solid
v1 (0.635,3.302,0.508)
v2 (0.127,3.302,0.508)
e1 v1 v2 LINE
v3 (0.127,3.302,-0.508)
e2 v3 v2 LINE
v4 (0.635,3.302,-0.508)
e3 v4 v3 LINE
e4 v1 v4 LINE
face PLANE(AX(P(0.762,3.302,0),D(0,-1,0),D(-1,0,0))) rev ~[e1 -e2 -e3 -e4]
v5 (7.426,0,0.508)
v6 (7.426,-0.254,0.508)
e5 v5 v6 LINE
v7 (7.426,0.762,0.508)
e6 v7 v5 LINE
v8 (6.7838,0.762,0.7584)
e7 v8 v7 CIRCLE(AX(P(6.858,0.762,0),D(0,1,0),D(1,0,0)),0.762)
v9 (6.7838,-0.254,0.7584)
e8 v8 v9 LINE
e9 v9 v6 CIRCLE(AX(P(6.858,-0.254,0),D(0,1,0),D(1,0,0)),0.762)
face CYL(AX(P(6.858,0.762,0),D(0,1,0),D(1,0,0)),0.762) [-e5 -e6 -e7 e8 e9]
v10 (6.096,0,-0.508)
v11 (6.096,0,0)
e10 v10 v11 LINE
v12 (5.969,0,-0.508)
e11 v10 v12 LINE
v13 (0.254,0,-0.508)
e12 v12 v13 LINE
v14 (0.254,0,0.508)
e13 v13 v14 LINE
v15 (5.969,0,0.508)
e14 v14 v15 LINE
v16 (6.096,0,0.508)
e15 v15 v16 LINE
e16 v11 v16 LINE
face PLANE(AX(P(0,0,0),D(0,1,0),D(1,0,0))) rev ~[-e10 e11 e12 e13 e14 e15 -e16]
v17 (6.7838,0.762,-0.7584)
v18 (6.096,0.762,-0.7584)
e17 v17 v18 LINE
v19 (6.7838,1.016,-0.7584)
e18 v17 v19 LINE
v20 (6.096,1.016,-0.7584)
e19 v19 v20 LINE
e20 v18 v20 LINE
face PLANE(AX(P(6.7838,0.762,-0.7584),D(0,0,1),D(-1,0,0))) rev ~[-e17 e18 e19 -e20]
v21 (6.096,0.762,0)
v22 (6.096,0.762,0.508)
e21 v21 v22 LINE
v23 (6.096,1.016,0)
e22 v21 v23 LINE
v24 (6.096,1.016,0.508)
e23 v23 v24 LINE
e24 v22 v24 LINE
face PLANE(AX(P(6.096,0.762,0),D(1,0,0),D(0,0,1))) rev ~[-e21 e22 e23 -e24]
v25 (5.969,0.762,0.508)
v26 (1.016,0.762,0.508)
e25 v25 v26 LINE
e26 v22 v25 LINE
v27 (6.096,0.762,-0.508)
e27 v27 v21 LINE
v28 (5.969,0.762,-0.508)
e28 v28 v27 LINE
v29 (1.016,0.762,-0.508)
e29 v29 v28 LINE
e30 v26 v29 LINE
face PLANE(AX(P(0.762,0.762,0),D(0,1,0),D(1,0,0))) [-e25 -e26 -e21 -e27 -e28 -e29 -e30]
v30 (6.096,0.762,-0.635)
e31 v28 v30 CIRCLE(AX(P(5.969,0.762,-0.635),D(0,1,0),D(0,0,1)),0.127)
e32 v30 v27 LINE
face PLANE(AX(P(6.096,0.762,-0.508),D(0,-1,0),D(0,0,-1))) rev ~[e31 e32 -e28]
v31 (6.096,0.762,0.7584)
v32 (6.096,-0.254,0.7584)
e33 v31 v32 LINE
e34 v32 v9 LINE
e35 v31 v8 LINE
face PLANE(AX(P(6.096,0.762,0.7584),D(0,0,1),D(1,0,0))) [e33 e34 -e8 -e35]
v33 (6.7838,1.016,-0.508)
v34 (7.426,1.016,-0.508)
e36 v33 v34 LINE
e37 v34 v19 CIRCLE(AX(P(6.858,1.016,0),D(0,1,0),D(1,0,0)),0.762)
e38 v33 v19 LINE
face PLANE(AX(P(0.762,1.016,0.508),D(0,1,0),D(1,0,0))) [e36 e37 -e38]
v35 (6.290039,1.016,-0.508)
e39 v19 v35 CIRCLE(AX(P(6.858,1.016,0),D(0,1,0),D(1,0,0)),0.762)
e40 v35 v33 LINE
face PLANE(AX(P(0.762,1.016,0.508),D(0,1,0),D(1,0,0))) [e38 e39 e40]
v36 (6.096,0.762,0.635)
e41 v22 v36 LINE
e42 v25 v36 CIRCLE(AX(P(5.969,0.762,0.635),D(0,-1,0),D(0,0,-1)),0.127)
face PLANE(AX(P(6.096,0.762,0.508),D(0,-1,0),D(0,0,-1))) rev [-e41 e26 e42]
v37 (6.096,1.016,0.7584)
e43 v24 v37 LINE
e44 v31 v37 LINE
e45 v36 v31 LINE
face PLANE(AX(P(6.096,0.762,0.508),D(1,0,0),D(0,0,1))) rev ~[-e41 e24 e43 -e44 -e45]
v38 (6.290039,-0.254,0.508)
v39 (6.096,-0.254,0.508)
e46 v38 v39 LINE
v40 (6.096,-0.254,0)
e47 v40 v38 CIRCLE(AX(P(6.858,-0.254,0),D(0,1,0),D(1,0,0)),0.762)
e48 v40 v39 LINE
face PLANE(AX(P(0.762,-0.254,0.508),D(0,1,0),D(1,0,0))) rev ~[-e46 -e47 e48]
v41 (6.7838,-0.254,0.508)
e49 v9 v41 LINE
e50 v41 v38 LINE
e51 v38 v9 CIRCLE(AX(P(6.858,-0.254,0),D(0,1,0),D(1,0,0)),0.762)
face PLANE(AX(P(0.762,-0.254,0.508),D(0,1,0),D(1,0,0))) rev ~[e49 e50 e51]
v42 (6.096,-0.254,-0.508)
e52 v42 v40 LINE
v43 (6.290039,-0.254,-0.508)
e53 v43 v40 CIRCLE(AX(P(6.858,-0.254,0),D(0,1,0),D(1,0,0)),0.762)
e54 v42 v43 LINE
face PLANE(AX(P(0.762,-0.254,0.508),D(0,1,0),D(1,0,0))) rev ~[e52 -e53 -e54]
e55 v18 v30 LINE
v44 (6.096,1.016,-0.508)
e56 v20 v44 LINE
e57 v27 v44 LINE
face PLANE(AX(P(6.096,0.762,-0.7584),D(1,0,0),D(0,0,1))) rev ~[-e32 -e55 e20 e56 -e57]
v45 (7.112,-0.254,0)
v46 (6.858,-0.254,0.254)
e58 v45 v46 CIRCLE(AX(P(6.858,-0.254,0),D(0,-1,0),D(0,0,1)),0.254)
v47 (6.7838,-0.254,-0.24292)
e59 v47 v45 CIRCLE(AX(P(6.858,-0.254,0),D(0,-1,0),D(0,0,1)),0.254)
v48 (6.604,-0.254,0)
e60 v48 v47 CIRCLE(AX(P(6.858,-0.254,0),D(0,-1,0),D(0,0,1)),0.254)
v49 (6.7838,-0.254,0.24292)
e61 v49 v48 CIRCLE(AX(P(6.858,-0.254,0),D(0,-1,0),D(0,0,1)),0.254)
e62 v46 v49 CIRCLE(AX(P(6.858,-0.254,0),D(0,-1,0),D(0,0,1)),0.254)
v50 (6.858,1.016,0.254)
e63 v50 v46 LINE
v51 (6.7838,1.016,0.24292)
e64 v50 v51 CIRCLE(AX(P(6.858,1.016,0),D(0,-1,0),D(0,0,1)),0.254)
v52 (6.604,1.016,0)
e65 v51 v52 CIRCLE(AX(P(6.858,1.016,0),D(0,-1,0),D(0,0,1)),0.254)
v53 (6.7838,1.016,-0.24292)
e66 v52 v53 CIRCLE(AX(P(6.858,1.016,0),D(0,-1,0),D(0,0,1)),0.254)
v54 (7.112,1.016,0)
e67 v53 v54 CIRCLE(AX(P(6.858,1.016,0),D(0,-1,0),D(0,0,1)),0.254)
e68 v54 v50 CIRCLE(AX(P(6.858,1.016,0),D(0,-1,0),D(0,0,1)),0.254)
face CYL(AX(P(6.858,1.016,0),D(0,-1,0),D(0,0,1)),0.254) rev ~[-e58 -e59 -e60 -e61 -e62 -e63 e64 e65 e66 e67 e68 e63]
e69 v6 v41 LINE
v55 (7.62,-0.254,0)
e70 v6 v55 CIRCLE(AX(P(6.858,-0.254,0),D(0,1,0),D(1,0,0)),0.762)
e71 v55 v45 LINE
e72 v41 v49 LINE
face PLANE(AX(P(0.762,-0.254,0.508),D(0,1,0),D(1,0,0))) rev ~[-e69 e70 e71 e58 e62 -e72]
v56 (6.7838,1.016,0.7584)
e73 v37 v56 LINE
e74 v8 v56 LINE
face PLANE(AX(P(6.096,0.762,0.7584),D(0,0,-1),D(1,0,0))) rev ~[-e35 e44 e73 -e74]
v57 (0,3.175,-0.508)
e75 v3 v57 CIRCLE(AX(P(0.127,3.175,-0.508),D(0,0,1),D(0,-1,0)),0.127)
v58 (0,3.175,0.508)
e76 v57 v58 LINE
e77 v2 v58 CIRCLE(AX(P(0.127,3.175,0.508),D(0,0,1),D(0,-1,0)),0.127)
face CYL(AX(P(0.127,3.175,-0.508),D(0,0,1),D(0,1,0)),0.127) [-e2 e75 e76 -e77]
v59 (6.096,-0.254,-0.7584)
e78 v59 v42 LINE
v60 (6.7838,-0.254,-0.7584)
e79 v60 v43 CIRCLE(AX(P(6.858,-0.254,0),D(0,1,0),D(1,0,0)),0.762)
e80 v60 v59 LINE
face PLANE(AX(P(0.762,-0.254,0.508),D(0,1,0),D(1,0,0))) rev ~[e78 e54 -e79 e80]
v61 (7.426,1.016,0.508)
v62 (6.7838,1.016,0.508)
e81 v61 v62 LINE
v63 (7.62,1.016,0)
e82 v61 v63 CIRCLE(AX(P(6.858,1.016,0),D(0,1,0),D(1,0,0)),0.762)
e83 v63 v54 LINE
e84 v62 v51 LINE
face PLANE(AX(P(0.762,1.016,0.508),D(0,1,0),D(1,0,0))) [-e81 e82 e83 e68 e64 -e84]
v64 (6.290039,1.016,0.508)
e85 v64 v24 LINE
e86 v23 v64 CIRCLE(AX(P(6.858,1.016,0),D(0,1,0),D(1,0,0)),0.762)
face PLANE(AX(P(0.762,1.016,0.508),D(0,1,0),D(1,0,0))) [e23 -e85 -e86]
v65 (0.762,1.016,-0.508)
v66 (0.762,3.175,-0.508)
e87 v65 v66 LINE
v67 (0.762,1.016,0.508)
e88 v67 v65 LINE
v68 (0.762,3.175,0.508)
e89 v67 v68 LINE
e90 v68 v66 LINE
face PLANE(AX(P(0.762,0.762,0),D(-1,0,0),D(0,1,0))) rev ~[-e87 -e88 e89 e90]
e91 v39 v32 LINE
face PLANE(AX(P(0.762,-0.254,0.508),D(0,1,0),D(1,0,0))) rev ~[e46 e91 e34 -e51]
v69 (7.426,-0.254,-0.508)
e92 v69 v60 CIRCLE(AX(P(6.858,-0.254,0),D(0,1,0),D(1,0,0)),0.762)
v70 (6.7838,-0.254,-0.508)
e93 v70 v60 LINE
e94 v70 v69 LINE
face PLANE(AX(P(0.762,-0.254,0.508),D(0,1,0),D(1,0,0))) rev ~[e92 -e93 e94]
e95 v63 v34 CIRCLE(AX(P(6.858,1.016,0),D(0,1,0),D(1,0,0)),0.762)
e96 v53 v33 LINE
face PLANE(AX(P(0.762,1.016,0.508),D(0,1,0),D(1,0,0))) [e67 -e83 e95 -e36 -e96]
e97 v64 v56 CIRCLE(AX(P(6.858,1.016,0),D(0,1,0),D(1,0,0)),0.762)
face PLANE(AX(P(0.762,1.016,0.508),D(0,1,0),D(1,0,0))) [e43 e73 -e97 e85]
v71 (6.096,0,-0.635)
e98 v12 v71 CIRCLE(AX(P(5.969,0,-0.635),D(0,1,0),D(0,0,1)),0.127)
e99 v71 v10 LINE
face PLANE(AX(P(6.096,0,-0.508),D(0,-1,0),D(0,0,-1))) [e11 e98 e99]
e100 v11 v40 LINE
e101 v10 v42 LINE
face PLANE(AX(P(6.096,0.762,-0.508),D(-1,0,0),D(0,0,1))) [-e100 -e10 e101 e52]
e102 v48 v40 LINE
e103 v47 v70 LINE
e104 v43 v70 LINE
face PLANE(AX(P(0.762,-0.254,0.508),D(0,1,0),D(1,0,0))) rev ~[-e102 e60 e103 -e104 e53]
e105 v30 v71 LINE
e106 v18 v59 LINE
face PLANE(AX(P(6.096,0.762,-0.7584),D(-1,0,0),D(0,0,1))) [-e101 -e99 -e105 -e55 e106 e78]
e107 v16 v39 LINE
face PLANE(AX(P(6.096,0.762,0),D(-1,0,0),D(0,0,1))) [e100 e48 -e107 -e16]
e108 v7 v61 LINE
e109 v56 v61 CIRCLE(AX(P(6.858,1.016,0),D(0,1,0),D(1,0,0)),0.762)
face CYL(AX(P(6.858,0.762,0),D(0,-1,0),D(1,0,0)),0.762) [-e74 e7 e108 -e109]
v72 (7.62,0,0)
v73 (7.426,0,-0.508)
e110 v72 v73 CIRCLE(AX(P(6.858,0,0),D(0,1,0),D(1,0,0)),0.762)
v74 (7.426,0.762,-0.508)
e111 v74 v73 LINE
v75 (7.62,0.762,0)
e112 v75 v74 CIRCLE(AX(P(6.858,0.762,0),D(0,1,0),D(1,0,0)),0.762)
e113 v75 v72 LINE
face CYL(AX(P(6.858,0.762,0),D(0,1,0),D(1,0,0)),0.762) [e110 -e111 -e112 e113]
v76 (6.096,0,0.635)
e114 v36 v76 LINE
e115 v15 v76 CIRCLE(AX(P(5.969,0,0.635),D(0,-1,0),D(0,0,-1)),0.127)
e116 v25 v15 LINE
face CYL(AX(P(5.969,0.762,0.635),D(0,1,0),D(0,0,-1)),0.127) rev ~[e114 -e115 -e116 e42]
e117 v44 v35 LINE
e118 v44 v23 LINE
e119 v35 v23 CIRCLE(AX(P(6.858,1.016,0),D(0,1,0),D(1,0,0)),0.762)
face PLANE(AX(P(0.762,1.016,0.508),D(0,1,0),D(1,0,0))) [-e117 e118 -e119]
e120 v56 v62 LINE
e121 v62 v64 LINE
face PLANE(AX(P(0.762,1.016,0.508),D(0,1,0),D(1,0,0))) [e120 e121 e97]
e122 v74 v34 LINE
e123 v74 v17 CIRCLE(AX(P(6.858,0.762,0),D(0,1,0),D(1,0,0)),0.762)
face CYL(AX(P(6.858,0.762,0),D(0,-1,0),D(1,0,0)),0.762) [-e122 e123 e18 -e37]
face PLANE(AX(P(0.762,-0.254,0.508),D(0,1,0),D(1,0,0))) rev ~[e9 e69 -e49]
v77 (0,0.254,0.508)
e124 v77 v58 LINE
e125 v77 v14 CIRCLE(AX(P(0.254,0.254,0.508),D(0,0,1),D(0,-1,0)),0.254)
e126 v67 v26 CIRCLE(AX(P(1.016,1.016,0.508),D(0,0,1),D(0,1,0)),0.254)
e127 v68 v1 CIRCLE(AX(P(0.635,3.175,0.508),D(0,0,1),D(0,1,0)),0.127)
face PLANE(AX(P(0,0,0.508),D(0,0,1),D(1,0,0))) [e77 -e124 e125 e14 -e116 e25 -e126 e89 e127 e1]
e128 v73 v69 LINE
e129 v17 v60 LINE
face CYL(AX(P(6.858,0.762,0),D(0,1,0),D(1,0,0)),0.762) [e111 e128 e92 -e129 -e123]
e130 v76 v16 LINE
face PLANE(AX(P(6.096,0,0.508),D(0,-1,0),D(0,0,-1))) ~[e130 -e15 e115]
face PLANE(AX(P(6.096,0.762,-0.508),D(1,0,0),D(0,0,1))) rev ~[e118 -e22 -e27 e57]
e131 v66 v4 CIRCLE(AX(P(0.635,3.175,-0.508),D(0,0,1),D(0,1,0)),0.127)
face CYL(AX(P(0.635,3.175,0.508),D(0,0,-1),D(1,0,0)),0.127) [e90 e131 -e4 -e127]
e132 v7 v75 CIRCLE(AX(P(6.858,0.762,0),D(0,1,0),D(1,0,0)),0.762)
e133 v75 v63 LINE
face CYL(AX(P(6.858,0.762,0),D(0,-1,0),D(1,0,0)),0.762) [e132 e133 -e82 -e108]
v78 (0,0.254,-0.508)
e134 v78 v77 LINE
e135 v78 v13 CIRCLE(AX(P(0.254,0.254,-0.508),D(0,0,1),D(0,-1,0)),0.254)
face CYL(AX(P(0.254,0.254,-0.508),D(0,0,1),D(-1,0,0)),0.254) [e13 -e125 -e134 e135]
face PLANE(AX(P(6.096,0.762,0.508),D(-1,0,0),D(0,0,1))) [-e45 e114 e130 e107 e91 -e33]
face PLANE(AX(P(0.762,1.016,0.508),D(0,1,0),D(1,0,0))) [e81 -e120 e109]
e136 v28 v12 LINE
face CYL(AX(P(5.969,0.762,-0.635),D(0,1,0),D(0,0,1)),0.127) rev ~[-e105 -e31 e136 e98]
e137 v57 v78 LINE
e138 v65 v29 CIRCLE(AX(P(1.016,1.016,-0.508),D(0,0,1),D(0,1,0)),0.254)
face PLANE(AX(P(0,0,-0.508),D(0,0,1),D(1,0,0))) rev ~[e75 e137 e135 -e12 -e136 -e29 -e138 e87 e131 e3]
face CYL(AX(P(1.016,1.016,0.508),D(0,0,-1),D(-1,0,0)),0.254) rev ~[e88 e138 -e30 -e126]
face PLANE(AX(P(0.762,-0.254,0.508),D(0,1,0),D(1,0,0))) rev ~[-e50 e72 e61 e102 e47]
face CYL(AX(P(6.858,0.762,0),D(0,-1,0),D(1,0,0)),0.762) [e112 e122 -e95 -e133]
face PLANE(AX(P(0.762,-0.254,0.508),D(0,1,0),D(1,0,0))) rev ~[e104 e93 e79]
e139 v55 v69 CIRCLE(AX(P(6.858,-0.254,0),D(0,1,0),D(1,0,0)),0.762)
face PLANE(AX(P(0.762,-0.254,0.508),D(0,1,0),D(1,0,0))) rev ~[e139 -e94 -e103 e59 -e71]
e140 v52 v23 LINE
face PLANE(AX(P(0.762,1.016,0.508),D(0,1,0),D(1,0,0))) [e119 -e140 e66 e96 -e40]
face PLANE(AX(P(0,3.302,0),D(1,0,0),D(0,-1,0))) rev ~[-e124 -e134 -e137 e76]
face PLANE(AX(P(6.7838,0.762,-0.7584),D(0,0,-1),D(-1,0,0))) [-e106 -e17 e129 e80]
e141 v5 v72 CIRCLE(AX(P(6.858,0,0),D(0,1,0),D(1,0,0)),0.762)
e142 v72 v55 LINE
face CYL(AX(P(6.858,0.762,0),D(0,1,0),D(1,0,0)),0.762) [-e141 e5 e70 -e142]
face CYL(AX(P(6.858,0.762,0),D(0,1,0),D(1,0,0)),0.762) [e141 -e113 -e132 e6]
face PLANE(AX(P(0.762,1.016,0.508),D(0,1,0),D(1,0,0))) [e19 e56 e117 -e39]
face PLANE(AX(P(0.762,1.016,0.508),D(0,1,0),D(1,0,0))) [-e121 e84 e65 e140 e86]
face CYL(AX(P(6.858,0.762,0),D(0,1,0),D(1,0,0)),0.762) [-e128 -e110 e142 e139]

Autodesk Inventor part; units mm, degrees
ref_plane "YZ Plane" through (0, 0, 0) normal (1, 0, 0) x (0, 1, 0)
ref_plane "XZ Plane" through (0, 0, 0) normal (0, 1, 0) x (-1, 0, 0)
ref_plane "XY Plane" through (0, 0, 0) normal (0, 0, 1) x (1, 0, 0)
sketch "Sketch1" plane through (0, 0, 0) normal (0, 0, 1) x (1, 0, 0)
  line L0 (0, 4.0132) -> (0, -0.9652) projected
  line L1 (-1.524, 0) -> (9.144, 0) projected
  line L2 (7.62, 0) -> (0, 0)
  line L3 (0, 0) -> (0, 0.762)
  line L4 (0, 0.762) -> (7.62, 0.762)
  line L5 (7.62, 0.762) -> (7.62, 0)
  line L6 (0, 0.762) -> (0.762, 0.762)
  line L7 (0.762, 0.762) -> (0.762, 3.302)
  line L8 (0.762, 3.302) -> (0, 3.302)
  line L9 (0, 3.302) -> (0, 0.762)
  line L10 (6.096, -0.254) -> (7.62, -0.254)
  line L11 (7.62, -0.254) -> (7.62, 1.016)
  line L12 (7.62, 1.016) -> (6.096, 1.016)
  line L13 (6.096, 1.016) -> (6.096, -0.254)
  line L14 (6.096, -0.254) -> (7.62, 1.016) construction
  line L15 (7.62, -0.254) -> (6.096, 1.016) construction
  line L16 (0, 0.381) -> (7.62, 0.381) construction
  point P0 (6.858, 0.381)
  dimension "d0" = 0.762
  dimension "d1" = 0.762
  dimension "d2" = 3.302
  dimension "d4" = 1.27
  dimension "d5" = 1.524
  dimension "d6" = 6.858
  dimension "d7" = 0
extrude "Extrusion1" add sketch "Sketch1" along normal mid plane 1.016 contours L8 L7 L4 L0 | L4 L13 L1 L0 | L13 L4 L5 L1
sketch "Sketch2" plane through (0.762, 0.762, 0.508) normal (0, 1, 0) x (1, 0, 0)
  line L0 (-0.762, 1.5748) -> (-0.762, -0.5588) projected
  line L1 (8.382, 0.508) -> (-2.286, 0.508) projected
  line L2 (6.858, 1.016) -> (6.858, 0) projected
  circle A0 centre (6.096, 0.508) radius 0.762
  line L3 (0, 1.016) -> (6.858, 1.016) projected
  line L4 (6.858, 0) -> (0, 0) projected
  line L5 (6.664, 0) -> (6.858, 0)
  line L6 (6.858, 0) -> (6.858, 1.016)
  line L7 (6.858, 1.016) -> (6.664, 1.016)
  line L8 (5.334, -0.2504) -> (6.0218, -0.2504)
  line L9 (6.0218, -0.2504) -> (6.0218, 1.2664)
  line L10 (6.0218, 1.2664) -> (5.334, 1.2664)
  line L11 (5.334, 1.2664) -> (5.334, -0.2504)
  line L12 (5.334, -0.2504) -> (6.0218, 1.2664) construction
  line L13 (6.0218, -0.2504) -> (5.334, 1.2664) construction
  point P0 (-0.762, 0.508)
  point P1 (5.6779, 0.508)
  dimension "d10" = 1.524
  dimension "d30" = 6.096
extrude "Extrusion2" add sketch "Sketch2" against normal blind 1.016 and the other way blind 0.254 contours A0 L4 L9 L1 | L1 L9 L3 A0 | L9 L4 A0 L1 | L1 A0 L3 L9 | L3 L9 A0 | A0 L9 L4 | L11 L3 A0 | A0 L4 L11 | L9 A0 L4 | L3 A0 L9 | A0 L3 L11 L10 | L8 L11 L4 A0
extrude "Extrusion3" cut sketch "Sketch2" against normal up to next contours A0 L3 L2 | L2 L4 A0
hole "Hole1" at (6.858, 1.016, 0) direction (0, -1, 0) diameter 0.508 end through all
fillet "Fillet2" radius 0.254 2 edges at (0.762, 0.762, 0) (0, 0, 0)
fillet "Fillet3" radius 0.127 2 edges at (6.096, 0.381, 0.508) (6.096, 0.381, -0.508)
fillet "Fillet4" radius 0.127 2 edges at (0, 3.302, 0) (0.762, 3.302, 0)
properties part number "J007872 GRIN LENS HOLDER 0_5MM DIA Rev -" material "STAINLESS STEEL, 316"
